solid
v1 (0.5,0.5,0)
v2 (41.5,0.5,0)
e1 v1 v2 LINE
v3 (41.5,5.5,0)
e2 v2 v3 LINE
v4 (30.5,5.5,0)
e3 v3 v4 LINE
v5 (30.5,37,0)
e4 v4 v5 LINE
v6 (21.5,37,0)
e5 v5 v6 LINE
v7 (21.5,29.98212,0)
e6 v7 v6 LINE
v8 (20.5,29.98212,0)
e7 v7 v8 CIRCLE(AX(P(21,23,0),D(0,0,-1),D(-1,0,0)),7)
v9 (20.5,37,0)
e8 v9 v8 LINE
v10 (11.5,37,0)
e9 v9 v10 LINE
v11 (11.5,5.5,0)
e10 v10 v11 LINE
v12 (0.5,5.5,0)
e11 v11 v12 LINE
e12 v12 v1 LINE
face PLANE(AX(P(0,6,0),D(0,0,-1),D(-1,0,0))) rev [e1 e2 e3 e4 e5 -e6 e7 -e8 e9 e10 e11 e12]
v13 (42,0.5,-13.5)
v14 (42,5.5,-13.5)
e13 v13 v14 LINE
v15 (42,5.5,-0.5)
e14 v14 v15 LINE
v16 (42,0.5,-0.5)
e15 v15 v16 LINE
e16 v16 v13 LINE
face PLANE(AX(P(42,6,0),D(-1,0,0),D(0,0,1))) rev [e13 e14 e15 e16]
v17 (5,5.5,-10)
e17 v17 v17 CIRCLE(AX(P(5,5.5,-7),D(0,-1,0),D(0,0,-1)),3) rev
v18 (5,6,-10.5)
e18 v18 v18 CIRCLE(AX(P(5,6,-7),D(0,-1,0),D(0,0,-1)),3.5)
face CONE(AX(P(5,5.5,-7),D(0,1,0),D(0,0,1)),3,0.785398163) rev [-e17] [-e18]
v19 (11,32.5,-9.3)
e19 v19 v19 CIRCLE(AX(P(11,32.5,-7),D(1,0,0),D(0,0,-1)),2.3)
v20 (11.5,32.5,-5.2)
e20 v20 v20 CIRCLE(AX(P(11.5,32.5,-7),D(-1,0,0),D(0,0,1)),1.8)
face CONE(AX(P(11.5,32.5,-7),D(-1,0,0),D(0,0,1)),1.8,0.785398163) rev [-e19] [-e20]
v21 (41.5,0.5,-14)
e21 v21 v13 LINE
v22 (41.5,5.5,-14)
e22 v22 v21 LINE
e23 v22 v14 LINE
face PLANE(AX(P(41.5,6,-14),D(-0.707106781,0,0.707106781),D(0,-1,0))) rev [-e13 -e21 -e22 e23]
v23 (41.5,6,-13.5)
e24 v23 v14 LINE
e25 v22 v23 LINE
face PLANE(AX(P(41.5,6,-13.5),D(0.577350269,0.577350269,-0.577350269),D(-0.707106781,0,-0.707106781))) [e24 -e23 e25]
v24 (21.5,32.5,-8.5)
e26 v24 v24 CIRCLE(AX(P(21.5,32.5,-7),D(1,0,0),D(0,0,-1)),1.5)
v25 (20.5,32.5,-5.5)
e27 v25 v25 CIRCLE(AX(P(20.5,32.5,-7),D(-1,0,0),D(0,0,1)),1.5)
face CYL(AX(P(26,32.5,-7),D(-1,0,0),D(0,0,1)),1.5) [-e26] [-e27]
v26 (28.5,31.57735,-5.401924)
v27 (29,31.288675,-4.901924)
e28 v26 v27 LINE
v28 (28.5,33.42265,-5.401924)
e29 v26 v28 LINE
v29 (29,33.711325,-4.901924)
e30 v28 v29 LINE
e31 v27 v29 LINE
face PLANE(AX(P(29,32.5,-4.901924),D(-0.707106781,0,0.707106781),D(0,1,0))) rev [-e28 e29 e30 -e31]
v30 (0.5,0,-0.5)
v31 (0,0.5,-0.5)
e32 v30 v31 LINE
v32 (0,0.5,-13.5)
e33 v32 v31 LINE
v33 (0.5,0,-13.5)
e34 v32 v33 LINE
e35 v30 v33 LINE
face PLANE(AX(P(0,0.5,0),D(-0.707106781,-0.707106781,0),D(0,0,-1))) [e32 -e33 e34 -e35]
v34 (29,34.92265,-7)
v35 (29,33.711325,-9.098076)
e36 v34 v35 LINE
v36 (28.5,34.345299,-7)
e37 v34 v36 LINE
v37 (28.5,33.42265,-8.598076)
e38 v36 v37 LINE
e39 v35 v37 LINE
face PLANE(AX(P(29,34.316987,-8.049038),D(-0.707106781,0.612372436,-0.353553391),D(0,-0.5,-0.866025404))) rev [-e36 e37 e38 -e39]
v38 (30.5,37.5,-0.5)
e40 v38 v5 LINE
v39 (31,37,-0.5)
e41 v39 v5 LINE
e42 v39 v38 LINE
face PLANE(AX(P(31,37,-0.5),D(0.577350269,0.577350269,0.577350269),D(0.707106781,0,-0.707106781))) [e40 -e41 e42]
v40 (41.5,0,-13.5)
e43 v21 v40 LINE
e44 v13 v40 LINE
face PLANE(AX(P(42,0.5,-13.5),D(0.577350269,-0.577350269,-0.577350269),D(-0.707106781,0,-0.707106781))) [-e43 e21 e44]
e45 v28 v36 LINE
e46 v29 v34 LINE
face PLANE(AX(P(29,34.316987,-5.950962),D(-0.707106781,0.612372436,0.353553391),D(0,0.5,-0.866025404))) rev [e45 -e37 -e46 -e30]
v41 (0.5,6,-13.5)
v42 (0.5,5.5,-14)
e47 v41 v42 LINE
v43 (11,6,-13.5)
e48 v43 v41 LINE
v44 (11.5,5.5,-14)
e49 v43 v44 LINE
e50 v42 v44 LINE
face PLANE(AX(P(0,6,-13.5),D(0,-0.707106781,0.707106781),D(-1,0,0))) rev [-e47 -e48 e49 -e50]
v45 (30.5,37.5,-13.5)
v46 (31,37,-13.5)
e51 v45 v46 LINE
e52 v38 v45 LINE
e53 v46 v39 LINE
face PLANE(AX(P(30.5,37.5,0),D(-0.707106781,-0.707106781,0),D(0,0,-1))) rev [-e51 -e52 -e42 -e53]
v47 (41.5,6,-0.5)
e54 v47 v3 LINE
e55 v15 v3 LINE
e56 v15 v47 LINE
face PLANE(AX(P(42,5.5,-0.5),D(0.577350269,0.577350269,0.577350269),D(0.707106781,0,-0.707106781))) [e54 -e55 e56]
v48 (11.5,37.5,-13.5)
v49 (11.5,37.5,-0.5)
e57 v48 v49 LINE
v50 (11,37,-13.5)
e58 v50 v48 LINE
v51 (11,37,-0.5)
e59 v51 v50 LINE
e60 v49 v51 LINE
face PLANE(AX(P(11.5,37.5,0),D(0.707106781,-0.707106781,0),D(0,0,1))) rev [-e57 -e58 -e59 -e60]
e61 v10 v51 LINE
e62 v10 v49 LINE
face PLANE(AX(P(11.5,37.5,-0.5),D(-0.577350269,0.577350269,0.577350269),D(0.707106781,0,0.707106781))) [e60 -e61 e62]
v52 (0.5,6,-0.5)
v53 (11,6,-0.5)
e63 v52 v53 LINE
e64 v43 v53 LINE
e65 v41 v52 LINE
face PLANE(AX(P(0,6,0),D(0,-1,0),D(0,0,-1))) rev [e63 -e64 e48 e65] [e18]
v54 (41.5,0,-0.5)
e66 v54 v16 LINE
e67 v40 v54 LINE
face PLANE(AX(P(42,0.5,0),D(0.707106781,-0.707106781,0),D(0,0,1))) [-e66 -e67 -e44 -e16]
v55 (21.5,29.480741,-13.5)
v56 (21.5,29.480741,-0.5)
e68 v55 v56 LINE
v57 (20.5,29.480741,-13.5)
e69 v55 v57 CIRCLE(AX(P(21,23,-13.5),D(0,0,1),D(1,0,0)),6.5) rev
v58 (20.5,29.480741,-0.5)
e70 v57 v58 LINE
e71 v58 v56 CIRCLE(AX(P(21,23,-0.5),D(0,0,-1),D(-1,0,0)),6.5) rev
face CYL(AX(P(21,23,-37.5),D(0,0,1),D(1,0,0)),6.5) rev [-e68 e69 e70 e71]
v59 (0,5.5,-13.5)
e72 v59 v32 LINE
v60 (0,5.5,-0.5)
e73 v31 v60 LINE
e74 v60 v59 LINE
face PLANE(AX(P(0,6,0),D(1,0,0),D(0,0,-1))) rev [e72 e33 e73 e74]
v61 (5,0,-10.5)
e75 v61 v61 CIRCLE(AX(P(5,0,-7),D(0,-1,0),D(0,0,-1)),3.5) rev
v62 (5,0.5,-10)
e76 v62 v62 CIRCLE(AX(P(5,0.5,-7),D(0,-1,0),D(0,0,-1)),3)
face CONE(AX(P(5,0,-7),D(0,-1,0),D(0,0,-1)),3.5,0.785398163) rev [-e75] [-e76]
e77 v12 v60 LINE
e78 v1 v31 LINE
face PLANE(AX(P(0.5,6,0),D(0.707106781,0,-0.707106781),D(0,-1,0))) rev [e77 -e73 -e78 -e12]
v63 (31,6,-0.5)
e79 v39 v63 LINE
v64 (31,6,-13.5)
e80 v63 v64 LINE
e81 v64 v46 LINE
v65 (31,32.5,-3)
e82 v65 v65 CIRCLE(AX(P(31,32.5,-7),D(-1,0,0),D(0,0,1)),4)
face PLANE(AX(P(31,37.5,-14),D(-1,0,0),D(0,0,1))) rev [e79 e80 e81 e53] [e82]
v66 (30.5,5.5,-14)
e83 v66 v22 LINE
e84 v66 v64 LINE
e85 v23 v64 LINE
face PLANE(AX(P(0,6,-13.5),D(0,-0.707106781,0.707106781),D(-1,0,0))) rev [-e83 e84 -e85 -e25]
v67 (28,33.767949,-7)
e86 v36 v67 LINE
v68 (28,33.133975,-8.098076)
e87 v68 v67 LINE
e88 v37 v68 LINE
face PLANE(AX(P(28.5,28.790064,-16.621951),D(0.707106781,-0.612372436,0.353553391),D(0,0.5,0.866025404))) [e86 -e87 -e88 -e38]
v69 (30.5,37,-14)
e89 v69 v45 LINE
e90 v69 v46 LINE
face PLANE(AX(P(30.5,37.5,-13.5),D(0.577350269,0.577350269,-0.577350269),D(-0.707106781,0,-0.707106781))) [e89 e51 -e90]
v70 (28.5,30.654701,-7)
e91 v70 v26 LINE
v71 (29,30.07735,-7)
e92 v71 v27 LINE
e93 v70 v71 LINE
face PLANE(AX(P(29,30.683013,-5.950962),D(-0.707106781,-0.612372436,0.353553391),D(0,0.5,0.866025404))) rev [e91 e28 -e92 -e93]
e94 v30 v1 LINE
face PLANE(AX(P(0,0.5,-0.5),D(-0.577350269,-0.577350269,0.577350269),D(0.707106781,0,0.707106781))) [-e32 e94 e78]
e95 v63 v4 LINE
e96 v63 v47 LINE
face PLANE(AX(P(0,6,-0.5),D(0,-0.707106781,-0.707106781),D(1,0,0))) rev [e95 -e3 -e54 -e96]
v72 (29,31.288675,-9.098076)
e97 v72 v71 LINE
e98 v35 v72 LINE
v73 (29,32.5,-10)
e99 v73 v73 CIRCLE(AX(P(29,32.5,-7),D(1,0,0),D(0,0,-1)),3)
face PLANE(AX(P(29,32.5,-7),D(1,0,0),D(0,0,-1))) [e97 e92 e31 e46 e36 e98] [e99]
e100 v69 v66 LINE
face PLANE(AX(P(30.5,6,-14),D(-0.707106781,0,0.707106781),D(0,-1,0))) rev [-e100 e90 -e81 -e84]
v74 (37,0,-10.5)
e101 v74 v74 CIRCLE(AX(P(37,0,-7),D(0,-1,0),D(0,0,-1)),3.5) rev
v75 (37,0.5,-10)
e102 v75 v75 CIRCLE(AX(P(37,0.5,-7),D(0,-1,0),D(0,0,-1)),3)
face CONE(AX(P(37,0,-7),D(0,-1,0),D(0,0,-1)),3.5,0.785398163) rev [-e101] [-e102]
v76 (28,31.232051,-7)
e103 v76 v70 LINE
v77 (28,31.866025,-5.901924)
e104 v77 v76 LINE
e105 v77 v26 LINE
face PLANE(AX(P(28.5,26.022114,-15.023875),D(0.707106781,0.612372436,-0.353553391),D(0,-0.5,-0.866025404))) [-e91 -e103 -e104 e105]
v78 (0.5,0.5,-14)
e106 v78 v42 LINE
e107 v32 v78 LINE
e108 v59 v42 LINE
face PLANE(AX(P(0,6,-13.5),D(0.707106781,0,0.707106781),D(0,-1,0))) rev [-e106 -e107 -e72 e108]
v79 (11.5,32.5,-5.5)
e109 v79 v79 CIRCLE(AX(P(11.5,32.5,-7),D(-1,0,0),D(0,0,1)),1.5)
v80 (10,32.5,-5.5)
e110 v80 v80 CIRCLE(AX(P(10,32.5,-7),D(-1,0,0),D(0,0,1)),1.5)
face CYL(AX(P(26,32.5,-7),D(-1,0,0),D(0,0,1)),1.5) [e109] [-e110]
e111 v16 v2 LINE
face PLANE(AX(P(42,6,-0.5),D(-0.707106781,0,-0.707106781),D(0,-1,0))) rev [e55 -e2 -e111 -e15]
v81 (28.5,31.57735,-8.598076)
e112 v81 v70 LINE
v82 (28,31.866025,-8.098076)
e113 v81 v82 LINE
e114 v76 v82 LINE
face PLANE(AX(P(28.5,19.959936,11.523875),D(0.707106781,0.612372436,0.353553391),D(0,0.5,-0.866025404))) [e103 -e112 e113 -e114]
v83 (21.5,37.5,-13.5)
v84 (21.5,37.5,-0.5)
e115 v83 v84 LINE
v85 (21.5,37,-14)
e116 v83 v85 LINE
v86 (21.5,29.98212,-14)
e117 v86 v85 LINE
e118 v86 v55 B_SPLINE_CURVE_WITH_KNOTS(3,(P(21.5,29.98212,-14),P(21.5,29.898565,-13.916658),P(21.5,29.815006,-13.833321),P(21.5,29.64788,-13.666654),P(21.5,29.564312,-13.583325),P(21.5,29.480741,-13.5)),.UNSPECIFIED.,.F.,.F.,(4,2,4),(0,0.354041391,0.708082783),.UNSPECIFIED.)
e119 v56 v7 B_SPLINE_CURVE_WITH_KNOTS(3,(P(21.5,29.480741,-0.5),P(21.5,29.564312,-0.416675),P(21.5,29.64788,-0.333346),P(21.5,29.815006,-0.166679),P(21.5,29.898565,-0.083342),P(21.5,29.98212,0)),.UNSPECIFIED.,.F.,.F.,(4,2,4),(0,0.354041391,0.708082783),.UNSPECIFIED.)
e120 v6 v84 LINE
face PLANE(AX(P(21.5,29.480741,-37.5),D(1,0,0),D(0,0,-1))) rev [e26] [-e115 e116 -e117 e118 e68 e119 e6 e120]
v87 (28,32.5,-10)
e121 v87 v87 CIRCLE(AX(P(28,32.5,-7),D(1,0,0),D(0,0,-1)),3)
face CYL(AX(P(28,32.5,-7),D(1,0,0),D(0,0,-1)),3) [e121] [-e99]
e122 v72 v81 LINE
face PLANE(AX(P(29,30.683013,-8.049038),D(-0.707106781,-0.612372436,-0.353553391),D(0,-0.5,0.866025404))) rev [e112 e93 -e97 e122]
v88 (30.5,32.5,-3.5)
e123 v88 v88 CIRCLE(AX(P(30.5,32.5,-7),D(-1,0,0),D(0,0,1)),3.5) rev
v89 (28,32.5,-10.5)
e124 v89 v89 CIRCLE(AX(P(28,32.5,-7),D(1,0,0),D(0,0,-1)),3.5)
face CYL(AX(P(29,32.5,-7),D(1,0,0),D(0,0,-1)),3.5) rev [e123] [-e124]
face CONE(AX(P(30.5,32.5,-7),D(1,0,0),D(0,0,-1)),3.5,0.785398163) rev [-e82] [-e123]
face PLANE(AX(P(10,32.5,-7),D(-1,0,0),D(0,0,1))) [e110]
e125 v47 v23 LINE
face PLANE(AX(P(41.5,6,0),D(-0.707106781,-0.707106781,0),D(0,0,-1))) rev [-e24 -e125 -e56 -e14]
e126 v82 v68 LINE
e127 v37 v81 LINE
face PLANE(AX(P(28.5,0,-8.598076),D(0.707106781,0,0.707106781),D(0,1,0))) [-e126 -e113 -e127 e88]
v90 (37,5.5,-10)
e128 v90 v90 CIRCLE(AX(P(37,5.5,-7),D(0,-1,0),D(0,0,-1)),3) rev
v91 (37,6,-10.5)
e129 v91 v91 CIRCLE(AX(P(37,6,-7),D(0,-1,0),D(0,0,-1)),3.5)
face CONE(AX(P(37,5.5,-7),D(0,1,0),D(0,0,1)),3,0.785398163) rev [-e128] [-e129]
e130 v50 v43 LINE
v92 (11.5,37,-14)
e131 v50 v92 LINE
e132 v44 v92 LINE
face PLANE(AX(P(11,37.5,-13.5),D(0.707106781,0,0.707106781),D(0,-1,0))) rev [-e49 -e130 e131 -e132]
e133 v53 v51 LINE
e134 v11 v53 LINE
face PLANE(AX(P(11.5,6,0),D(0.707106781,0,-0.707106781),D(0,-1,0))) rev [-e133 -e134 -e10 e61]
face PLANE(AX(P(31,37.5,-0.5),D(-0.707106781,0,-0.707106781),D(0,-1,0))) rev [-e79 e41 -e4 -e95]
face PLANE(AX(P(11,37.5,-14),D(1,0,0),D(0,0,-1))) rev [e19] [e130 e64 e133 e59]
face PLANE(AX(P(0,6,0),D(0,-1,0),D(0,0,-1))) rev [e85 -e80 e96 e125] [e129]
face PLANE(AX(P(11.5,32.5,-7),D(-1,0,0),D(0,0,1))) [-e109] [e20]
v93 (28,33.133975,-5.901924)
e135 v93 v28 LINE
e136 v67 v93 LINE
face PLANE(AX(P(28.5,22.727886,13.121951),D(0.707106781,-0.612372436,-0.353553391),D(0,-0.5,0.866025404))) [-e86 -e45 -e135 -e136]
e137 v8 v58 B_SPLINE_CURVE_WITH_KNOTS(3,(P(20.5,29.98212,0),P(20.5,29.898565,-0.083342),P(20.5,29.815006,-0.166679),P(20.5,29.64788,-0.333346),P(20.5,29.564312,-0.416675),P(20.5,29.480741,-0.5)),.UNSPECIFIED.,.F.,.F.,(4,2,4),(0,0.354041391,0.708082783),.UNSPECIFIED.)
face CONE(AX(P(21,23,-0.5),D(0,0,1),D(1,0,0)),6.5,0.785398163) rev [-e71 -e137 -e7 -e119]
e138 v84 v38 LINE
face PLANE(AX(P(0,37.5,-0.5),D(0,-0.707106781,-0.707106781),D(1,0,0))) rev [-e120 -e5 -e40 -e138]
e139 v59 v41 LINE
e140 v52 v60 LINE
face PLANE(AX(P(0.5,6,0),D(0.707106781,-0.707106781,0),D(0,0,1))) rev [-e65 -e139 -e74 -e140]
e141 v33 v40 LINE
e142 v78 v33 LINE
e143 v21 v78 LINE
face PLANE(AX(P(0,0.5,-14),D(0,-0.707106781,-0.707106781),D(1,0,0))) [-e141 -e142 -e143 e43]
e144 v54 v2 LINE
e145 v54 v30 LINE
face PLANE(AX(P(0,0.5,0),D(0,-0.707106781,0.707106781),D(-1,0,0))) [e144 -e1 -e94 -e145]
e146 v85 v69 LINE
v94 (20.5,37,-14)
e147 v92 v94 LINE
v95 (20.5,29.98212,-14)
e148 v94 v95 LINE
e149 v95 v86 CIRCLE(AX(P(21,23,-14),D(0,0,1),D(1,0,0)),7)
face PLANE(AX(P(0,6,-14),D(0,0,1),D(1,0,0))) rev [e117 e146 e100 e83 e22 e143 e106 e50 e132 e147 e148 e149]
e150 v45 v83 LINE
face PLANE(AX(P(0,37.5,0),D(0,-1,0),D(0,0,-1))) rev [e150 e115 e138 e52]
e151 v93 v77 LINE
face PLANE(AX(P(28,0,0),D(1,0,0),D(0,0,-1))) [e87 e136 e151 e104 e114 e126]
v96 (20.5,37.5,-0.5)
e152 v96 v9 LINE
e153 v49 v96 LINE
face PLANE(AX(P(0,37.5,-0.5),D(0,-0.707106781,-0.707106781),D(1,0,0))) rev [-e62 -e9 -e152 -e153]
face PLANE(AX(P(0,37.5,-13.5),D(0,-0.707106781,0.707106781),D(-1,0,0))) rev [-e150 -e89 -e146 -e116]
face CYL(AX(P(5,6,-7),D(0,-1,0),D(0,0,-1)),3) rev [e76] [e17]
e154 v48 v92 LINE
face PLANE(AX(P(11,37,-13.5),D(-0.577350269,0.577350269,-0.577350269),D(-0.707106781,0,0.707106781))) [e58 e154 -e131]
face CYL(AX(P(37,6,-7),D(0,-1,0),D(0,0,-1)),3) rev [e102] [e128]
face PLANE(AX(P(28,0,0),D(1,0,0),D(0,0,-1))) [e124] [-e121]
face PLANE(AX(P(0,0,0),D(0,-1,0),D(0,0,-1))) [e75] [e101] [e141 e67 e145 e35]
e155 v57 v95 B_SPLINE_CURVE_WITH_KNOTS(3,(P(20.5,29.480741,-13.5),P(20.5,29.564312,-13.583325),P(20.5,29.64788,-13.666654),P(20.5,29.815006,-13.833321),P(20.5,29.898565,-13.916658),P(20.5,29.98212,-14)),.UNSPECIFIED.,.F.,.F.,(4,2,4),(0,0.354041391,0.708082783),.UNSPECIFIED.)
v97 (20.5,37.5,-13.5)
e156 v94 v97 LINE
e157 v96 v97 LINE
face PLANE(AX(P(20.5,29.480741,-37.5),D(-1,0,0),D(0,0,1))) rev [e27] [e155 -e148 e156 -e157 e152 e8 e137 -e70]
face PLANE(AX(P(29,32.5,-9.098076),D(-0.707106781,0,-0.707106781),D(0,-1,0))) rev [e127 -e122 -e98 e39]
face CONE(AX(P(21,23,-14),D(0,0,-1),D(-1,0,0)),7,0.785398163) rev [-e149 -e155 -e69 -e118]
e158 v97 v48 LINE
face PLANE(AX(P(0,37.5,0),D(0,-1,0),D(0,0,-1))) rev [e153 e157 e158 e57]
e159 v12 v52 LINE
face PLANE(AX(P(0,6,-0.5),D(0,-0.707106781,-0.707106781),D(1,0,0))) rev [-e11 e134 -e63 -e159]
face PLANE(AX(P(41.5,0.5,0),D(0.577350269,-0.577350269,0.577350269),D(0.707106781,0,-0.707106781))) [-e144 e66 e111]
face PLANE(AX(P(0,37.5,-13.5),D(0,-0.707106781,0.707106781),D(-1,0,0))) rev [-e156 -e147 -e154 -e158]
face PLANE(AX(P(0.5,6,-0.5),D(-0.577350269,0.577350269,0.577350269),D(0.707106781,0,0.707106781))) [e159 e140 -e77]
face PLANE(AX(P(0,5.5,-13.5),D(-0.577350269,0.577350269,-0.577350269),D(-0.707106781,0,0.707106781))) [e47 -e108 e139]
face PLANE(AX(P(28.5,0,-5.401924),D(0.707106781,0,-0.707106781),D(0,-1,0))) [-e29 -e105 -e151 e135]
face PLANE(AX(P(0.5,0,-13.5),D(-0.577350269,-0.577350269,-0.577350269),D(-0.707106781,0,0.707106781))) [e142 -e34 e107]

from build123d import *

# Parameters (mm, degrees)
SKETCH_1_W           = 42
SKETCH_1_H           = 14
SKETCH_1_R           = 3
EXTRUDE_1_DEPTH      = 6
SKETCH_2_W           = 20
SKETCH_2_H           = 14
EXTRUDE_2_DEPTH      = 31.5
CUT_EXTRUDE_1_DEPTH  = 37.5
SKETCH_5_R           = 3.5
CUT_EXTRUDE_2_DEPTH  = 2
SKETCH_6_R           = 3.5
SKETCH_6_R_2         = 3
CUT_EXTRUDE_3_DEPTH  = 1
EXTRUDE_3_DEPTH      = 1
EXTRUDE_3_DEPTH_BACK = 15
SKETCH_7_R           = 1.5
SKETCH_8_R           = 1.8
SKETCH_8_R_2         = 1.5
CUT_EXTRUDE_4_DEPTH  = 0.5
CHAMFER_1_SIZE       = 0.5
CHAMFER_2_SIZE       = 0.5
CHAMFER_3_SIZE       = 0.5
CHAMFER_4_SIZE       = 0.5


with BuildPart() as part:
    # 草图1 → 凸台-拉伸1 (new body)
    with BuildSketch(Plane(origin=(0, 0, 0), x_dir=(1, 0, 0), z_dir=(0, 1, 0))):
        with Locations((21, 7)):
            Rectangle(SKETCH_1_W, SKETCH_1_H)
        with Locations(Location((5, 7, 0), (0, 0, 270))):
            Circle(SKETCH_1_R, mode=Mode.SUBTRACT)
        with Locations(Location((37, 7, 0), (0, 0, 270))):
            Circle(SKETCH_1_R, mode=Mode.SUBTRACT)
    extrude(amount=EXTRUDE_1_DEPTH)

    # 草图2 → 凸台-拉伸2 (add)
    with BuildSketch(Plane(origin=(0, 6, 0), x_dir=(1, 0, 0), z_dir=(0, 1, 0))):
        with Locations((21, 7)):
            Rectangle(SKETCH_2_W, SKETCH_2_H)
    extrude(amount=EXTRUDE_2_DEPTH)

    # 草图3 → 切除-拉伸1 (cut)
    with BuildSketch(Plane.XY):
        with BuildLine():
            Line((21.5, 29.480740698), (21.5, 37.5))
            Line((21.5, 37.5), (20.5, 37.5))
            Line((20.5, 37.5), (20.5, 29.480740698))
            ThreePointArc((20.5, 29.480740698), (21, 16.5), (21.5, 29.480740698))
        make_face()
    extrude(amount=-CUT_EXTRUDE_1_DEPTH, mode=Mode.SUBTRACT)

    # 草图5 → 切除-拉伸2 (cut)
    with BuildSketch(Plane(origin=(31, 0, 0), x_dir=(0, 0, -1), z_dir=(1, 0, 0))):
        with Locations((7, 32.5)):
            Circle(SKETCH_5_R)
    extrude(amount=-CUT_EXTRUDE_2_DEPTH, mode=Mode.SUBTRACT)

    # 草图6 → 切除-拉伸3 (cut)
    # profile 1 of 2: a face of its own
    with BuildSketch(Plane(origin=(29, 0, 0), x_dir=(0, 0, -1), z_dir=(1, 0, 0))):
        with Locations((7, 32.5)):
            Circle(SKETCH_6_R)
        with Locations((7, 32.5)):
            Circle(SKETCH_6_R_2, mode=Mode.SUBTRACT)
    # profile 2 of 2: a face of its own
    with BuildSketch(Plane(origin=(29, 0, 0), x_dir=(0, 0, -1), z_dir=(1, 0, 0))):
        Polygon((5.401923789, 31.577350269), (5.401923789, 33.422649731), (7, 34.345299462), (8.598076211, 33.422649731), (8.598076211, 31.577350269), (7, 30.654700538), align=None)
    extrude(amount=-CUT_EXTRUDE_3_DEPTH, mode=Mode.SUBTRACT)

    # 草图7 → 凸台-拉伸3 (add, two sides: drawn at the far end of the back side and taken through both)
    with BuildSketch(Plane.ZY.offset(-11).offset(-EXTRUDE_3_DEPTH_BACK)):
        with Locations((-7, 32.5)):
            Circle(SKETCH_7_R)
    extrude(amount=EXTRUDE_3_DEPTH + EXTRUDE_3_DEPTH_BACK)

    # 草图8 → 切除-拉伸4 (cut)
    with BuildSketch(Plane.ZY.offset(-11)):
        with Locations((-7, 32.5)):
            Circle(SKETCH_8_R)
        with Locations((-7, 32.5)):
            Circle(SKETCH_8_R_2, mode=Mode.SUBTRACT)
    extrude(amount=-CUT_EXTRUDE_4_DEPTH, mode=Mode.SUBTRACT)

    # 倒角1
    chamfer_1_edges = [part.edges().sort_by_distance(p)[0] for p in [
        (11, 32.5, -8.8),
    ]]
    chamfer(chamfer_1_edges, length=CHAMFER_1_SIZE - 0.0001)  # a hair under: the kernel refuses the full size

    # 倒角2
    chamfer_2_edges = [part.edges().sort_by_distance(p)[0] for p in [
        (31, 32.5, -3.5),
    ]]
    chamfer(chamfer_2_edges, length=CHAMFER_2_SIZE)

    # 倒角3
    chamfer_3_edges = [part.edges().sort_by_distance(p)[0] for p in [
        (29, 31.116025404, -7.799038106),
        (29, 32.5, -8.598076211),
        (29, 33.883974596, -7.799038106),
        (29, 33.883974596, -6.200961894),
        (29, 32.5, -5.401923789),
        (29, 31.116025404, -6.200961894),
        (28, 33.883974596, -6.200961894),
        (28, 33.883974596, -7.799038106),
        (28, 32.5, -8.598076211),
        (28, 31.116025404, -7.799038106),
        (28, 31.116025404, -6.200961894),
        (28, 32.5, -5.401923789),
    ]]
    chamfer(chamfer_3_edges, length=CHAMFER_3_SIZE - 0.0001)  # a hair under: the kernel refuses the full size

    # 倒角4
    chamfer_4_edges = [part.edges().sort_by_distance(p)[0] for p in [
        (21, 16.5, 0),
        (21, 16.5, -14),
        (0, 0, -7),
        (0, 6, -7),
        (11, 37.5, -7),
        (31, 37.5, -7),
        (42, 6, -7),
        (15.75, 37.5, 0),
        (11, 21.75, 0),
        (5.5, 6, 0),
        (0, 3, 0),
        (21, 0, 0),
        (26.25, 37.5, 0),
        (31, 21.75, 0),
        (36.5, 6, 0),
        (42, 3, 0),
        (42, 0, -7),
        (26.25, 37.5, -14),
        (31, 21.75, -14),
        (36.5, 6, -14),
        (42, 3, -14),
        (21, 0, -14),
        (0, 3, -14),
        (5.5, 6, -14),
        (11, 21.75, -14),
        (15.75, 37.5, -14),
        (37, 0, -10),
        (37, 6, -10),
        (5, 0, -10),
        (5, 6, -10),
    ]]
    chamfer(chamfer_4_edges, length=CHAMFER_4_SIZE)


solid = part.part
